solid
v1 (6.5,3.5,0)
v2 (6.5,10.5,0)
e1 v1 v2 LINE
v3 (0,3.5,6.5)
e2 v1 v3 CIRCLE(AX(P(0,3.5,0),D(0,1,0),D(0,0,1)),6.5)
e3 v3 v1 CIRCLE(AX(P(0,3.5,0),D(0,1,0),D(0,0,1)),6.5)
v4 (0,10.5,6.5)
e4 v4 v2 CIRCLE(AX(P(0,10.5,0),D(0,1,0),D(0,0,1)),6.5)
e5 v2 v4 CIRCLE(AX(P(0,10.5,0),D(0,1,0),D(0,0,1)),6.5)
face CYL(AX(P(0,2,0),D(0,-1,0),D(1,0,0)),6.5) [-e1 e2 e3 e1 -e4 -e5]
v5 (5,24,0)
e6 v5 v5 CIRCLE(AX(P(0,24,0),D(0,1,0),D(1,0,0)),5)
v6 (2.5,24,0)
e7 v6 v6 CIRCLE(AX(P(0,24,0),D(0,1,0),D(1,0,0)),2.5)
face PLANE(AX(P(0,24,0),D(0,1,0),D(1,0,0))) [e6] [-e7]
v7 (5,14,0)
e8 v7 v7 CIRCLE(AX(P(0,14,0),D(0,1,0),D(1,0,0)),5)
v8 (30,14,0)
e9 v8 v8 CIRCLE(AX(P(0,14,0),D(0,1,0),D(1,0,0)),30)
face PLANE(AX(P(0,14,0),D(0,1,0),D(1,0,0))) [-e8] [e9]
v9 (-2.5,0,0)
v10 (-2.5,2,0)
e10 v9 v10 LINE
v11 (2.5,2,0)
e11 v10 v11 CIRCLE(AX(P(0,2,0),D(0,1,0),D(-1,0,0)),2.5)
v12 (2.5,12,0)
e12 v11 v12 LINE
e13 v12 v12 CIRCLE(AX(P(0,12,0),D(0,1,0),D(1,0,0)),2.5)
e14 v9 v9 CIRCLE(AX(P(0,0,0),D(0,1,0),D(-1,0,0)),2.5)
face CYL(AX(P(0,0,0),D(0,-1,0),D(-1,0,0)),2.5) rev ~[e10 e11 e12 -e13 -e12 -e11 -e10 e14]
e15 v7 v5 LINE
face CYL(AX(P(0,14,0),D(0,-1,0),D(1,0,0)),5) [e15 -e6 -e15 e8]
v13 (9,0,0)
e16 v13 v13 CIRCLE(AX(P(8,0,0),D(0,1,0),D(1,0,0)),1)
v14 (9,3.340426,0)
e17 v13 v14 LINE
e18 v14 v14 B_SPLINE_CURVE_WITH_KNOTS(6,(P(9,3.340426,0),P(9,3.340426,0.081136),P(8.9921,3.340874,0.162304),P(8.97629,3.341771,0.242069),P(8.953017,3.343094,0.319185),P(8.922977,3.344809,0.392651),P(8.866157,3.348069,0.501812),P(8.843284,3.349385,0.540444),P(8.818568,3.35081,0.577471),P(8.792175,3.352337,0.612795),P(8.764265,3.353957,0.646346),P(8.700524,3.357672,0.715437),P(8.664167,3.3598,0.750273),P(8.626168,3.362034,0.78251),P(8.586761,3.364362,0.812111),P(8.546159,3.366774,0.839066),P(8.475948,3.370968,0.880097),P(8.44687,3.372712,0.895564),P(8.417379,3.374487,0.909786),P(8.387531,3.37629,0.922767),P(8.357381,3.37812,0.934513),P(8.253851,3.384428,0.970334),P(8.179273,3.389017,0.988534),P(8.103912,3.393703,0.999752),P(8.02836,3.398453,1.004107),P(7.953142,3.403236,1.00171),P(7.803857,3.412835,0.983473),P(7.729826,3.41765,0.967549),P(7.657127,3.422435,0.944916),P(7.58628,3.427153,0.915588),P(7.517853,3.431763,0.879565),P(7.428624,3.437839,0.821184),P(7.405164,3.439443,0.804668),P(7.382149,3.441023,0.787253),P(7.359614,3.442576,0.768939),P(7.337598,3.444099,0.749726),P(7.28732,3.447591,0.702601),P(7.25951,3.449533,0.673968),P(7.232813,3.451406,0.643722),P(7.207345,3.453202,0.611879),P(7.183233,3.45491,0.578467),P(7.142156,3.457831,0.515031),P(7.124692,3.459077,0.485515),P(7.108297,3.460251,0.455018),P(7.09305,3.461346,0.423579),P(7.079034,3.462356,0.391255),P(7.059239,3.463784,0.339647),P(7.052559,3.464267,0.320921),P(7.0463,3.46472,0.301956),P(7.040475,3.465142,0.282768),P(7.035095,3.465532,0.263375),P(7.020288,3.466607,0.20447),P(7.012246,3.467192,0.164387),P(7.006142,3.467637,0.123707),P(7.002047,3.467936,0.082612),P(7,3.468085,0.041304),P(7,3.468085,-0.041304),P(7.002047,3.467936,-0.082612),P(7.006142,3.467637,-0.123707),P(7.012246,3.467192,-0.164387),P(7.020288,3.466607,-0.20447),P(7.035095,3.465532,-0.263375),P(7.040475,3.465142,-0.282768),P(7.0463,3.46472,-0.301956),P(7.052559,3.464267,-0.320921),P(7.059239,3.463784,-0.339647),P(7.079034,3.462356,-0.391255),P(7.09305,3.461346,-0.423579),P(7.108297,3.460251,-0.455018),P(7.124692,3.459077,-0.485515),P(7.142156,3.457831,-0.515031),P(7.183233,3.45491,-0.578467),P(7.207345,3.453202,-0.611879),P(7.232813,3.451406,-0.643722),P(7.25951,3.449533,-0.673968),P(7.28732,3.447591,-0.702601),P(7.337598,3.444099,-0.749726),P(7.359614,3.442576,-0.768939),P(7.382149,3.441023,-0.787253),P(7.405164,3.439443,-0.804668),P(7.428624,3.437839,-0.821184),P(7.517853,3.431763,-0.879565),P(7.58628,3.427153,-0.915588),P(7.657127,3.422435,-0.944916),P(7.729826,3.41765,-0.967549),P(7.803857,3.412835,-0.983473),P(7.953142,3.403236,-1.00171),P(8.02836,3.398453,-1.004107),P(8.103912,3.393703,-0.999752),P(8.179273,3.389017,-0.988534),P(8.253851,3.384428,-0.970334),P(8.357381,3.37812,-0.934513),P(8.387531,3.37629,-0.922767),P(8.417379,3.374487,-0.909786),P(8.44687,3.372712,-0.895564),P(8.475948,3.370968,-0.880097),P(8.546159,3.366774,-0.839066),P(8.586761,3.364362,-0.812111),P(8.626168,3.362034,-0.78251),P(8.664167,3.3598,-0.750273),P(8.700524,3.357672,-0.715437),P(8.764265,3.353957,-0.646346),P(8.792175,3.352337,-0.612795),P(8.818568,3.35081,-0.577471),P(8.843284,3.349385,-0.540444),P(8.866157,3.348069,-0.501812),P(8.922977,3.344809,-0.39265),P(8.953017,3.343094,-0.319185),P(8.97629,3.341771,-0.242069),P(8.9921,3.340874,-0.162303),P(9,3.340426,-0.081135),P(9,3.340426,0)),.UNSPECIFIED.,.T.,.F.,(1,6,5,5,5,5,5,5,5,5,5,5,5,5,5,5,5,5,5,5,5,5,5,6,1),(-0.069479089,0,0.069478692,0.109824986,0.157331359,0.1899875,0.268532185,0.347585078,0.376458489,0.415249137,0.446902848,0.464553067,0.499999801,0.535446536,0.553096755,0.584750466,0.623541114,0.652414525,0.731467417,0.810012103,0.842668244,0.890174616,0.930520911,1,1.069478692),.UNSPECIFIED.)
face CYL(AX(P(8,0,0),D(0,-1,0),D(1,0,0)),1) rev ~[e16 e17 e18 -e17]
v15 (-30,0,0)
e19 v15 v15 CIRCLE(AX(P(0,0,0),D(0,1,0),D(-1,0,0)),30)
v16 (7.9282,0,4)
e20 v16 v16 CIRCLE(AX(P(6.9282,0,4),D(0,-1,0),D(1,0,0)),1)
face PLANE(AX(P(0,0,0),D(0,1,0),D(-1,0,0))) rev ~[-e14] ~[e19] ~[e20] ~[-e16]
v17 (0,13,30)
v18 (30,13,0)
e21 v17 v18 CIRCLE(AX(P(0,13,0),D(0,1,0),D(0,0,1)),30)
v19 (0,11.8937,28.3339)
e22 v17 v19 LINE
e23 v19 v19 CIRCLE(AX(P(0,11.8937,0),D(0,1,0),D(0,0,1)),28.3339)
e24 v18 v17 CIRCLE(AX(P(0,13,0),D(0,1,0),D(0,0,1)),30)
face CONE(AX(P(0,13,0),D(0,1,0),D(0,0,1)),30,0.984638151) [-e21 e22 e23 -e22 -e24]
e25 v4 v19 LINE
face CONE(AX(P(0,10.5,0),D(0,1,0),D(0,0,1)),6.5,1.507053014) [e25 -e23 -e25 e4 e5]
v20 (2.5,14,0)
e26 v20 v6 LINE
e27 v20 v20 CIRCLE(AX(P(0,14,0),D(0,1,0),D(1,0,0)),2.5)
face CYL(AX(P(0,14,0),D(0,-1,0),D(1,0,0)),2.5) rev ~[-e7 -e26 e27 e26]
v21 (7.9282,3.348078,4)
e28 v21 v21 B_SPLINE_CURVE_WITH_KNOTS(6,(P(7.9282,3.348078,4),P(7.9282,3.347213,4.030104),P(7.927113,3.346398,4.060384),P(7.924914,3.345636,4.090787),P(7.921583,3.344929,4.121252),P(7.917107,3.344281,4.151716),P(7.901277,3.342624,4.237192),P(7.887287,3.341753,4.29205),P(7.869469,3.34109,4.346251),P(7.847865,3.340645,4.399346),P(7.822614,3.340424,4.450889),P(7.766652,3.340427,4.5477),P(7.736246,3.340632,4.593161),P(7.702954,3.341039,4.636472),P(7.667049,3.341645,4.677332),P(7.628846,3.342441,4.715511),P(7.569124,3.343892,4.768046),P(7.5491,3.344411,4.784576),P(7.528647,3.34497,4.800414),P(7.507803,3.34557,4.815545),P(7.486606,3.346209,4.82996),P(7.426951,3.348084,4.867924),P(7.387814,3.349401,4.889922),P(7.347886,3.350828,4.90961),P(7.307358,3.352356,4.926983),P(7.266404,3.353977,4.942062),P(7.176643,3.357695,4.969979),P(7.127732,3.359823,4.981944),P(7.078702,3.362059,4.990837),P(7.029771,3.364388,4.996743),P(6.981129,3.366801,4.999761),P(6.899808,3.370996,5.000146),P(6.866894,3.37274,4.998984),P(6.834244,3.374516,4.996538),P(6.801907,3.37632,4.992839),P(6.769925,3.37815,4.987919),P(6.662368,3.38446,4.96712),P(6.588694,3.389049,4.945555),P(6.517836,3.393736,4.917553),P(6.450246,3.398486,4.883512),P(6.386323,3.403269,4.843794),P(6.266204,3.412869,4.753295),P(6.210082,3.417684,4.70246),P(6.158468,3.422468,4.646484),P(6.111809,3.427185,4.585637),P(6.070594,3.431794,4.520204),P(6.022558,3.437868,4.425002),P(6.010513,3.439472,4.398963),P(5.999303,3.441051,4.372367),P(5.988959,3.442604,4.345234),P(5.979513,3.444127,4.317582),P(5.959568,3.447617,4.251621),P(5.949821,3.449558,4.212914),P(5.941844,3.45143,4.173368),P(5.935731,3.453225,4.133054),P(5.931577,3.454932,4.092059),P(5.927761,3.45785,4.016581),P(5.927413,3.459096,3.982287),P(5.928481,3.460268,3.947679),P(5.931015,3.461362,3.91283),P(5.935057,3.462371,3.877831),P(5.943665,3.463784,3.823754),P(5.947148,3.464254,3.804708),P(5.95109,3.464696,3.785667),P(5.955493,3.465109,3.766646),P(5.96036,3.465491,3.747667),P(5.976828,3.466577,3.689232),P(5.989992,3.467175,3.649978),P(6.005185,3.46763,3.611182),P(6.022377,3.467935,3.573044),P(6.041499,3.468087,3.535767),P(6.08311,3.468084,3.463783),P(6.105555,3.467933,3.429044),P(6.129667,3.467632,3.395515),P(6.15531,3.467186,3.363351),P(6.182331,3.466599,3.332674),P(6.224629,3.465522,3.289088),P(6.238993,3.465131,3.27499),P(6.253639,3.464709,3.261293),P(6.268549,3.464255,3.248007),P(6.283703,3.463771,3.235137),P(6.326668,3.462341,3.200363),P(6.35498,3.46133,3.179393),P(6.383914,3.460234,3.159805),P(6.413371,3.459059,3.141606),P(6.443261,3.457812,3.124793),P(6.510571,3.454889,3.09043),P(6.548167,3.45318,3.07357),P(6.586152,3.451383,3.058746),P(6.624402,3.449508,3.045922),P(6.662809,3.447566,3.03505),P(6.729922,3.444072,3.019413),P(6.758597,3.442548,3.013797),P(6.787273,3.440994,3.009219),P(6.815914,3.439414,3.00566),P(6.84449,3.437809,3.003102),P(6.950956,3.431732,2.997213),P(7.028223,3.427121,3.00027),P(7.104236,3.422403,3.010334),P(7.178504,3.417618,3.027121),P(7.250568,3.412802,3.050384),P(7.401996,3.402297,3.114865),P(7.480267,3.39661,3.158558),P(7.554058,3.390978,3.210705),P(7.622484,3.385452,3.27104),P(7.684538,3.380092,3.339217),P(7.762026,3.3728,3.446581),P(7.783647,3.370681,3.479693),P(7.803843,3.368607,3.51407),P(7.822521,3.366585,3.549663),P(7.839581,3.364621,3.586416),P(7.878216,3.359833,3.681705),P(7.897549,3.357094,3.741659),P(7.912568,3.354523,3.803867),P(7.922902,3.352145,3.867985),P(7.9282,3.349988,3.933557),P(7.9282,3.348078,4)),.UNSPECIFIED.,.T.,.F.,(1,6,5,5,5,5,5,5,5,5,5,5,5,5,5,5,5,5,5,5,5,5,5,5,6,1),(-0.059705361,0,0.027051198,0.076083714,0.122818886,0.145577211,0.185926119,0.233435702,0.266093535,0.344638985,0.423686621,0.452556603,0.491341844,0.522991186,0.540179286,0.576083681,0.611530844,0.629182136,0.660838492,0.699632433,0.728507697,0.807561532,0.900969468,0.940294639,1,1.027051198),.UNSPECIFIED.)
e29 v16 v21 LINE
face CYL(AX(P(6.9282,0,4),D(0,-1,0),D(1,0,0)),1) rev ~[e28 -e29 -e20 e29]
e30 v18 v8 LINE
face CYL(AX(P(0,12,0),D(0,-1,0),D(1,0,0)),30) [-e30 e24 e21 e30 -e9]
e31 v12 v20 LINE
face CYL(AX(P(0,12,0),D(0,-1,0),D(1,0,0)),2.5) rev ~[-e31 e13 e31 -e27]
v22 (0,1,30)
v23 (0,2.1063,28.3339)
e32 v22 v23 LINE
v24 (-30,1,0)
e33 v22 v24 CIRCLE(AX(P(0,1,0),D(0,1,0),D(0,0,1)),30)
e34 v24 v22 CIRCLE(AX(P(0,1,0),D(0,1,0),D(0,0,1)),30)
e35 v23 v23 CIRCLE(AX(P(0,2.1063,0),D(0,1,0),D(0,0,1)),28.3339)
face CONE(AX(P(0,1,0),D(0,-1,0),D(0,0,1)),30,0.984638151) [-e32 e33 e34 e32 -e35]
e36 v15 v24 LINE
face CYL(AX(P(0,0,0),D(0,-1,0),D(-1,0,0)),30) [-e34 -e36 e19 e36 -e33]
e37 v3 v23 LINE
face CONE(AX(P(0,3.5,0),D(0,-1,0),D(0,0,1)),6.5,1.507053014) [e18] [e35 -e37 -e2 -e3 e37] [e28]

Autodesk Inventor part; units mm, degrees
ref_plane "YZ Plane" through (0, 0, 0) normal (1, 0, 0) x (0, 1, 0)
ref_plane "XZ Plane" through (0, 0, 0) normal (0, 1, 0) x (-1, 0, 0)
sketch "Sketch1" plane through (0, 0, 0) normal (0, 1, 0) x (-1, 0, 0)
  circle A0 centre (0, 0) radius 30
  circle A1 centre (0, 0) radius 2.5
  dimension "d0" = 60
  dimension "d1" = 5
extrude "Extrusion1" add sketch "Sketch1" along normal blind 2
sketch "Sketch2" plane through (0, 2, 0) normal (0, 1, 0) x (1, 0, 0)
  circle A0 centre (0, 0) radius 2.5
  circle A1 centre (0, 0) radius 6.5
  dimension "d4" = 13
extrude "Extrusion2" add sketch "Sketch2" along normal blind 10
sketch "Sketch3" plane through (0, 12, 0) normal (0, 1, 0) x (1, 0, 0)
  circle A0 centre (0, 0) radius 30
  circle A1 centre (0, 0) radius 2.5
extrude "Extrusion3" add sketch "Sketch3" along normal blind 2
sketch "Sketch4" plane through (0, 0, 0) normal (1, 0, 0) x (0, 1, 0)
  line L0 (2, 6.5) -> (12, 6.5) projected
  line L1 (2, 6.5) -> (3.5, 6.5)
  line L2 (2, -30) -> (2, 30) projected
  line L3 (3.5, 6.5) -> (2, 30)
  line L4 (12, 6.5) -> (10.5, 6.5)
  line L5 (12, -30) -> (12, 30) projected
  line L6 (10.5, 6.5) -> (12, 30)
  line L7 (-2.8, 0) -> (16.8, 0) projected
  point P0 (0, 0)
  dimension "d9" = 1.5
  dimension "d10" = 1.5
revolve "Revolution1" add sketch "Sketch4" angle 360 about axis through (0, -10, 0) along (0, 1, 0) contours L2 L3 L0 | L6 L5 L0
sketch "Sketch6" plane through (0, 0, 0) normal (1, 0, 0) x (0, 1, 0)
  line L0 (0, -30) -> (0, 30) projected
  line L1 (0, 30) -> (1, 30)
  line L2 (0, 30) -> (2, 30) projected
  line L3 (1, 30) -> (2.1063, 28.3339)
  line L4 (2, 30) -> (3.5, 6.5) projected
  line L5 (2.1063, 28.3339) -> (1, 28.3339)
  line L6 (1, 28.3339) -> (1, 30)
  line L7 (14, -30) -> (14, 30) projected
  line L8 (14, 30) -> (13, 30)
  line L9 (12, 30) -> (14, 30) projected
  line L10 (13, 30) -> (11.8937, 28.3339)
  line L11 (10.5, 6.5) -> (12, 30) projected
  line L12 (11.8937, 28.3339) -> (14, 28.3339)
  line L13 (14, 28.3339) -> (14, 30)
  line L14 (13, 30) -> (13, 28.3339)
  line L15 (-2.8, 0) -> (16.8, 0) projected
  point P0 (0, 0)
  dimension "d12" = 1
  dimension "d13" = 2
revolve "Revolution2" cut sketch "Sketch6" angle 360 about axis through (0, -10, 0) along (0, 1, 0) contours L2 L4 L3 | L10 L11 L9
sketch "Sketch7" plane through (0, 14, 0) normal (0, 1, 0) x (1, 0, 0)
  circle A0 centre (0, 0) radius 2.5
  circle A1 centre (0, 0) radius 5
  dimension "d15" = 10
extrude "Extrusion4" add sketch "Sketch7" along normal blind 10
ref_plane "Work Plane1" through (0, 7, 0) normal (0, 1, 0) x (1, 0, 0)
sketch "Sketch8" plane through (0, 0, 0) normal (0, -1, 0) x (1, 0, 0)
  line L0 (0, 0) -> (8, 0)
  circle A0 centre (8, 0) radius 1
  circle A1 centre (6.9282, 4) radius 1
  dimension "d18" = 8
  dimension "d21" = 30
  dimension "d25" = 2
extrude "Extrusion5" cut sketch "Sketch8" against normal up to surface
properties part number "spool"
